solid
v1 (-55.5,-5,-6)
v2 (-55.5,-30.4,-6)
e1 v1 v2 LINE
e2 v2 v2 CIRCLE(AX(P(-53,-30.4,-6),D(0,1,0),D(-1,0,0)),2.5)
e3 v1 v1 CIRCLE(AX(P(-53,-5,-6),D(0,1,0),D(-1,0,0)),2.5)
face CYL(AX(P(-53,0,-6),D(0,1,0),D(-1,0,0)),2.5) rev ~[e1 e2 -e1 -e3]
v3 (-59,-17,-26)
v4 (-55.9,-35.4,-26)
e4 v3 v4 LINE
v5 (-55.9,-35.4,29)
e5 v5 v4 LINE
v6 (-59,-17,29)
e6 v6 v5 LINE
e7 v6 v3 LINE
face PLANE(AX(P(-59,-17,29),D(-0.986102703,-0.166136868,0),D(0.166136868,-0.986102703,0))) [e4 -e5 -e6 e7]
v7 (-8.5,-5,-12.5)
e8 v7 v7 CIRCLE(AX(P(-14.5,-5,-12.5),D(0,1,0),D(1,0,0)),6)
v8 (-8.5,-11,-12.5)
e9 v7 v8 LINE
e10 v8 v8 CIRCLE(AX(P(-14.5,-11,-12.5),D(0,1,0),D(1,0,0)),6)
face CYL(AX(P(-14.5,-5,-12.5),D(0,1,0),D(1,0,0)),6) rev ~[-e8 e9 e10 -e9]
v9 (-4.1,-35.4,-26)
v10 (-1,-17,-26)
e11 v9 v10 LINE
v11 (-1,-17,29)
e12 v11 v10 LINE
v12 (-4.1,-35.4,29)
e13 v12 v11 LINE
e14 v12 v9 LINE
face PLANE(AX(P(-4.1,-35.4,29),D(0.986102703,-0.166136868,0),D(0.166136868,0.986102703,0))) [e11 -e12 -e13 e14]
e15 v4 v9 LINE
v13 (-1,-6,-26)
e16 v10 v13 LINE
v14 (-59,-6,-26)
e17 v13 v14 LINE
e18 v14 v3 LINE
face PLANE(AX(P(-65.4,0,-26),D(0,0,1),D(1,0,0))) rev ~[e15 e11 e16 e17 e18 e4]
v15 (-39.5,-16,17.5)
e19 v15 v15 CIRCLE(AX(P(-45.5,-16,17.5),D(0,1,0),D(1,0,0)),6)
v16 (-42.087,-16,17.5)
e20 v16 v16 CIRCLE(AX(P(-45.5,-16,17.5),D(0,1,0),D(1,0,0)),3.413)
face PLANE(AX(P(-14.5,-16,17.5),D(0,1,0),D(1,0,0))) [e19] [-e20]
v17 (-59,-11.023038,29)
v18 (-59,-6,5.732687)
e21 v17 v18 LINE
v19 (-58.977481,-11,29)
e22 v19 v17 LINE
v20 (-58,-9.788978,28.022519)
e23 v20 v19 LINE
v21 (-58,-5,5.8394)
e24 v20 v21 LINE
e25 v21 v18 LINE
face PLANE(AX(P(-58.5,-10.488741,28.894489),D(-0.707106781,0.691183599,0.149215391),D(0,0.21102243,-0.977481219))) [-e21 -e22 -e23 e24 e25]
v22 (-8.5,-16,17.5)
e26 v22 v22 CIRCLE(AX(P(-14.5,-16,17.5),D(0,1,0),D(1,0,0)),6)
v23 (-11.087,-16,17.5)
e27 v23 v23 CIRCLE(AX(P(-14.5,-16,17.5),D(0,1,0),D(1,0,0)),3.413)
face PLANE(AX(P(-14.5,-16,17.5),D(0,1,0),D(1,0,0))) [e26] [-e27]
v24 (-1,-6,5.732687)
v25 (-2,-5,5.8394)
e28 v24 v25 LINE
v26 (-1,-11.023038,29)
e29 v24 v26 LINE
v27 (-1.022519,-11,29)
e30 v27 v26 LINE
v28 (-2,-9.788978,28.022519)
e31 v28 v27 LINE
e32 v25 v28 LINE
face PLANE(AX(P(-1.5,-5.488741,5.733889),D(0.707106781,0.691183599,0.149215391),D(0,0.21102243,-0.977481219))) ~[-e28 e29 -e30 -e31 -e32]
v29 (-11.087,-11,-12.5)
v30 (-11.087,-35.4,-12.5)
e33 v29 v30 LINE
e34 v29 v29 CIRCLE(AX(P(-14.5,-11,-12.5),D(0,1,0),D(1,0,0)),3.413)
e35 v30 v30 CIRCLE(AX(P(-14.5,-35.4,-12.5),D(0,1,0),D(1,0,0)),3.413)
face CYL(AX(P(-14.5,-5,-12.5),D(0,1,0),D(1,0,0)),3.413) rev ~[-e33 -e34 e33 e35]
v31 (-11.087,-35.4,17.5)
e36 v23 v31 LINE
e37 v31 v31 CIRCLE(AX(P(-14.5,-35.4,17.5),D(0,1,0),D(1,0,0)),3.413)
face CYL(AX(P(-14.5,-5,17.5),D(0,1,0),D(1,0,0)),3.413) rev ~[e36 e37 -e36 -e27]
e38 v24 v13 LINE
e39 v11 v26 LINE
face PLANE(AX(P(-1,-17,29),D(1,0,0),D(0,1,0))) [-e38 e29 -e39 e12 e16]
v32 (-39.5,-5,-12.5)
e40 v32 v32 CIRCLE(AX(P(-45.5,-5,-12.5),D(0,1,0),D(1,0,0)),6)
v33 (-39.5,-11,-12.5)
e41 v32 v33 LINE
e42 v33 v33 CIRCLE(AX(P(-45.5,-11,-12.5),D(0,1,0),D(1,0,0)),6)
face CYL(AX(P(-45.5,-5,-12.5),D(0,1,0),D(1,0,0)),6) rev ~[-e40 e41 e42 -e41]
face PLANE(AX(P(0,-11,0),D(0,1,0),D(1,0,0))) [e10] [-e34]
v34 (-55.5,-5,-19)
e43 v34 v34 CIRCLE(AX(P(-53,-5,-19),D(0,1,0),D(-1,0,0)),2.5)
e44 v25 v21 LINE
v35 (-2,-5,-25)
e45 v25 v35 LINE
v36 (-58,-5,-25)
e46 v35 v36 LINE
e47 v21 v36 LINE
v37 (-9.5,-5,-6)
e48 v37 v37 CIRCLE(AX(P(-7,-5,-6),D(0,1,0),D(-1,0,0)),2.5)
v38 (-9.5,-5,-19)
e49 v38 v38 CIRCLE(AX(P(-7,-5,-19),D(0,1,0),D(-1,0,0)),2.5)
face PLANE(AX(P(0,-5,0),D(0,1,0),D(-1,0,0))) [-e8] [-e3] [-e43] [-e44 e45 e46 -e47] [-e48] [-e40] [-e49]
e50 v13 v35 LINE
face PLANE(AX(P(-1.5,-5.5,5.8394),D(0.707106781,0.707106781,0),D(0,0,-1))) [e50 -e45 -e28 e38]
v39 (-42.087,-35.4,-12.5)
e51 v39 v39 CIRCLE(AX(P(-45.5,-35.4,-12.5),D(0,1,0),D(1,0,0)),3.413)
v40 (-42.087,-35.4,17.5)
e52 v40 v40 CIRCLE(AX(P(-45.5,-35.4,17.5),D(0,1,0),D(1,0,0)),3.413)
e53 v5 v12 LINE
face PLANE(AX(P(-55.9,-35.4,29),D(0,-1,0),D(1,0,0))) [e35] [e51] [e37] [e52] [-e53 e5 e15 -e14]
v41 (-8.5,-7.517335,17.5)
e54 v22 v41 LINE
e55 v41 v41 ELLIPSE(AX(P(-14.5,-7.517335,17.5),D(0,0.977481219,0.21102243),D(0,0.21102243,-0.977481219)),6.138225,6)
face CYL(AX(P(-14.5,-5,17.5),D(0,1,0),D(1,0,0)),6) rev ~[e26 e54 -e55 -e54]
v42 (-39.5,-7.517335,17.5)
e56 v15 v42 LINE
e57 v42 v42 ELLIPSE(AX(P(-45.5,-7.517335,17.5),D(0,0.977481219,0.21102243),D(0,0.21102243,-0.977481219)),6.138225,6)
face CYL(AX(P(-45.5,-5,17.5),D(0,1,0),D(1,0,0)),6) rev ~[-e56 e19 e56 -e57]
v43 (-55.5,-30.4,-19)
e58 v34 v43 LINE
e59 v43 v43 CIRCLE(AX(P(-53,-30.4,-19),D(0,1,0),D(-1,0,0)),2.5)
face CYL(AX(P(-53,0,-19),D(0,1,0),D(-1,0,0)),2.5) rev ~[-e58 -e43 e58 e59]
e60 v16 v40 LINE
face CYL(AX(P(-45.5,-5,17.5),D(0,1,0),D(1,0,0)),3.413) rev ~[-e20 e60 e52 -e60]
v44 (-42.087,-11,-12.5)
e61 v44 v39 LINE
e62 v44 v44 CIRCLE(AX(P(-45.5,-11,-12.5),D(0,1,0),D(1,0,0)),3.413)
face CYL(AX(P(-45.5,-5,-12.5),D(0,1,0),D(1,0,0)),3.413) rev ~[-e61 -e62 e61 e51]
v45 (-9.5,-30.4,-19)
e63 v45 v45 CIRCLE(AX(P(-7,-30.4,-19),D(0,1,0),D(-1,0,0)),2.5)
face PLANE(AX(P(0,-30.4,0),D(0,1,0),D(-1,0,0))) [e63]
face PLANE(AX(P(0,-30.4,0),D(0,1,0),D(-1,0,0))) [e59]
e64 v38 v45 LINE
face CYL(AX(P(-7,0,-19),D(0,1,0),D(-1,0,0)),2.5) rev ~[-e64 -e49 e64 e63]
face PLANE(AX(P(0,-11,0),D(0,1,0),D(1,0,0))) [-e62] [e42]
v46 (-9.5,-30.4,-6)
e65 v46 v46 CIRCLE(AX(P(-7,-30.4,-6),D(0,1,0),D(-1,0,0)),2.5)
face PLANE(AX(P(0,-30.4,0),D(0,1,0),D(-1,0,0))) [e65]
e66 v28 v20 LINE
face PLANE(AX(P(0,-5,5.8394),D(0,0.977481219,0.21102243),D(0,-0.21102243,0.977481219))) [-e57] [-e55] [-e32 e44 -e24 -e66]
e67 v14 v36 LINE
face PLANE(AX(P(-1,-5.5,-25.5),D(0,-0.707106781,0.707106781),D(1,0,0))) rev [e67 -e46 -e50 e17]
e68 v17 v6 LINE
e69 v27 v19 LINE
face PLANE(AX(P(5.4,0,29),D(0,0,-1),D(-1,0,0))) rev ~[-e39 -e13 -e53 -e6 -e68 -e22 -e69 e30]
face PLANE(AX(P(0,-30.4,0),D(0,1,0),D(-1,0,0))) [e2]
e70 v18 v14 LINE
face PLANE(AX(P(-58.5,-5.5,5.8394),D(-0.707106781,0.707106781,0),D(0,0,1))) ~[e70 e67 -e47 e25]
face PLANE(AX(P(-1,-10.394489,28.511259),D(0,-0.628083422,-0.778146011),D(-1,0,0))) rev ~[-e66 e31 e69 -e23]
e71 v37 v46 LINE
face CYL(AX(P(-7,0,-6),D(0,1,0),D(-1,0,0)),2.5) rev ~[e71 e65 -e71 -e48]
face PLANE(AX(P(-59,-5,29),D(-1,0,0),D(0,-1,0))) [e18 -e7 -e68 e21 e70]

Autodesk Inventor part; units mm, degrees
ref_plane "YZ Plane" through (0, 0, 0) normal (1, 0, 0) x (0, 1, 0)
ref_plane "XZ Plane" through (0, 0, 0) normal (0, 1, 0) x (-1, 0, 0)
ref_plane "XY Plane" through (0, 0, 0) normal (0, 0, 1) x (1, 0, 0)
sketch "Sketch1" plane through (0, 0, 0) normal (0, 1, 0) x (-1, 0, 0)
  line L0 (0, 0) -> (60, 0) construction
  line L1 (60, 0) -> (60, -25) construction
  line L2 (60, -25) -> (0, -25) construction
  line L3 (0, -25) -> (0, 0) construction
  line L4 (60.5, 0.5) -> (-0.5, 0.5)
  line L5 (-0.5, 0.5) -> (-0.5, -25.5)
  line L6 (-0.5, -25.5) -> (60.5, -25.5)
  line L7 (60.5, -25.5) -> (60.5, 0.5)
  circle A0 centre (53, -19) radius 2.5
  circle A1 centre (7, -19) radius 2.5
  circle A2 centre (7, -6) radius 2.5
  circle A3 centre (53, -6) radius 2.5
  line L8 (53, -19) -> (7, -19) construction
  line L9 (7, -19) -> (7, -6) construction
  line L10 (60.5, 0.5) -> (60.5, 20.5)
  line L11 (60.5, 20.5) -> (-0.5, 20.5)
  line L12 (-0.5, 20.5) -> (-0.5, 0)
  line L13 (89.6876, -43.5705) -> (-21.1545, -43.5705)
  line L14 (-21.1545, -43.5705) -> (-21.1545, 42.1657)
  line L15 (-21.1545, 42.1657) -> (89.6876, 42.1657)
  line L16 (89.6876, 42.1657) -> (89.6876, -43.5705)
  point P0 (30, -19)
  point P1 (30, -25)
  point P2 (7, -12.5)
  point P3 (0, -12.5)
  point P4 (-0.5, 0.5)
  point P5 (-0.5, 0.5)
  dimension "d0" = 25
  dimension "d1" = 60
  dimension "d2" = 0.5
  dimension "d3" = 0.5
  dimension "d4" = 0.5
  dimension "d5" = 0.5
  dimension "d6" = 5
  dimension "d7" = 46
  dimension "d8" = 13
  dimension "d72" = 20
sketch "Sketch2" plane through (0, 0, 0) normal (0, 1, 0) x (-1, 0, 0)
  line L0 (-5.4, 29) -> (65.4, 29)
  line L1 (65.4, 29) -> (65.4, -26)
  line L2 (65.4, -26) -> (-5.4, -26)
  line L3 (-5.4, -26) -> (-5.4, 29)
  line L4 (60.5, -25.5) -> (60.5, 0.5) construction
  line L5 (-0.5, 0.5) -> (-0.5, -25.5) construction
  line L6 (-0.5, -25.5) -> (60.5, -25.5) construction
  point P0 (0, 0)
  point P1 (60.5, -12.5)
  point P2 (65.4, 1.5)
  point P3 (30, -26)
  point P4 (30, -25.5)
  point P5 (30, -53.5)
  point P6 (110, 1.5)
  dimension "d9" = 70.8
  dimension "d10" = 55
  dimension "d50" = 35.4
  dimension "d74" = 13.5
extrude "Extrusion1" add sketch "Sketch2" against normal blind 35.4
extrude "Extrusion2" cut sketch "Sketch1" along normal blind 10 and the other way blind 5 contours L7 L6 L5 L4 | L4 L12 L11 L10 | L13 L14 L15 L16
extrude "Extrusion3" cut sketch "Sketch1" along normal blind 10 and the other way blind 30.4 contours A0 | A1 | A2 | A3
sketch "Sketch3" plane through (5.4, -35.4, -26) normal (0, 0, -1) x (1, 0, 0)
  line L0 (-70.8, 0) -> (-70.8, 17.5)
  line L1 (-70.8, 17.5) -> (-61.3, 17.5)
  line L2 (-61.3, 17.5) -> (-61.3, 3.175)
  line L3 (0, 0) -> (0, 17.5)
  line L4 (0, 17.5) -> (-9.5, 17.5)
  line L5 (-9.5, 17.5) -> (-9.5, 3.175)
  arc A0 (-61.3, 3.175) -> (-58.125, 0) centre (-58.125, 3.175) ccw
  arc A1 (-12.675, 0) -> (-9.5, 3.175) centre (-12.675, 3.175) ccw
  line L6 (0, 0) -> (-12.675, 0)
  line L7 (-70.8, -35.4) -> (-70.8, 0) projected
  line L8 (-70.8, 0) -> (0, 0) projected
  line L9 (-58.125, 0) -> (-70.8, 0)
  point P0 (-61.3, 0)
  dimension "d67" = 3.175
  dimension "d68" = 9.5
  dimension "d69" = 17.5
  dimension "d70" = 90
  dimension "d71" = 90
extrude "Extrusion4" add sketch "Sketch3" against normal up to surface (55 mm away)
sketch "Sketch4" plane through (0, -5, 0) normal (0, 1, 0) x (1, 0, 0)
  circle A0 centre (-45.5, -17.5) radius 3.413
  circle A1 centre (-14.5, -17.5) radius 3.413
  line L0 (-45.5, -17.5) -> (-14.5, -17.5) construction
  line L1 (-65.4, 26) -> (5.4, 26) projected
  line L2 (-45.5, -17.5) -> (-45.5, 12.5) construction
  line L3 (-45.5, 12.5) -> (-14.5, 12.5) construction
  line L4 (-14.5, 12.5) -> (-14.5, -17.5) construction
  circle A2 centre (-45.5, 12.5) radius 3.413
  circle A3 centre (-14.5, 12.5) radius 3.413
  point P0 (-30, -17.5)
  point P1 (-30, 26)
  dimension "d29" = 6.826
  dimension "d78" = 30
  dimension "d79" = 31
  dimension "d80" = 13.5
extrude "Extrusion5" cut sketch "Sketch4" against normal blind 36.5125
sketch "Sketch5" plane through (0, -5, 0) normal (0, 1, 0) x (1, 0, 0)
  circle A0 centre (-45.5, -17.5) radius 3.413 construction
  circle A1 centre (-14.5, -17.5) radius 3.413 construction
  circle A2 centre (-14.5, -17.5) radius 6
  circle A3 centre (-45.5, -17.5) radius 6
  circle A4 centre (-45.5, 12.5) radius 6
  circle A5 centre (-14.5, 12.5) radius 6
  circle A6 centre (-14.5, 12.5) radius 3.413 projected
  circle A7 centre (-45.5, 12.5) radius 3.413 projected
  point P0 (0, 0)
  point P1 (-43.1765, -26)
  point P2 (-47.8235, -26)
  point P3 (-12.1765, -26)
  point P4 (-16.8235, -26)
  dimension "d34" = 12
extrude "Extrusion6" cut sketch "Sketch5" against normal blind 6 contours A2 | A3 | A4 | A5 | A6
sketch "Sketch8" plane through (-52.725, -35.4, 29) normal (0, 0, 1) x (-1, 0, 0)
  line L0 (-22.725, 0) -> (-13.725, 0)
  line L1 (-13.725, 0) -> (-12.725, 1)
  line L2 (-12.725, 1) -> (-12.725, 4)
  line L3 (-12.725, 4) -> (-16.175, 7.45)
  line L4 (-16.175, 7.45) -> (-16.175, 9.8767)
  line L5 (-16.175, 9.8767) -> (-14.9578, 11.0939)
  arc A0 (-13.2458, 12.8058) -> (-14.9578, 11.0939) centre (-12.9761, 10.8241) ccw
  line L6 (-13.2458, 12.8058) -> (-12.725, 13.3267)
  line L7 (-12.725, 13.3267) -> (-12.725, 14.66)
  line L8 (-12.725, 14.66) -> (-13.2458, 15.1808)
  arc A1 (-14.9578, 16.8928) -> (-13.2458, 15.1808) centre (-12.9761, 17.1626) ccw
  line L9 (-14.9578, 16.8928) -> (-15.565, 17.5)
  line L10 (-15.565, 17.5) -> (-22.725, 17.5)
  line L11 (-22.725, 17.5) -> (-22.725, 0) construction
  line L12 (-14.9578, 11.0939) -> (-13.2458, 12.8058) construction
  line L13 (-14.9578, 16.8928) -> (-13.2458, 15.1808) construction
  line L14 (-29.275, 7.45) -> (-29.275, 9.8767)
  line L15 (-29.275, 9.8767) -> (-30.4922, 11.0939)
  line L16 (-30.4922, 11.0939) -> (-32.2042, 12.8058) construction
  arc A2 (-30.4922, 11.0939) -> (-32.2042, 12.8058) centre (-32.4739, 10.8241) ccw
  line L17 (-32.2042, 12.8058) -> (-32.725, 13.3267)
  line L18 (-32.725, 13.3267) -> (-32.725, 14.66)
  line L19 (-32.725, 14.66) -> (-32.2042, 15.1808)
  line L20 (-30.4922, 16.8928) -> (-32.2042, 15.1808) construction
  arc A3 (-32.2042, 15.1808) -> (-30.4922, 16.8928) centre (-32.4739, 17.1626) ccw
  line L21 (-29.885, 17.5) -> (-22.725, 17.5)
  line L22 (-30.4922, 16.8928) -> (-29.885, 17.5)
  line L23 (-32.725, 4) -> (-29.275, 7.45)
  line L24 (-22.725, 0) -> (-31.725, 0)
  line L25 (-32.725, 1) -> (-32.725, 4)
  line L26 (-31.725, 0) -> (-32.725, 1)
  line L27 (-13.725, 0) -> (-12.725, 0)
  line L28 (-12.725, 1) -> (-12.725, 0)
  line L29 (-32.725, 1) -> (-32.725, 0)
  line L30 (-32.725, 0) -> (-31.725, 0)
  line L31 (-13.725, 0) -> (-12.725, -1)
  line L32 (-12.725, -1) -> (-12.725, -4)
  line L33 (-16.175, -7.45) -> (-16.175, -9.8767)
  line L34 (-12.725, -4) -> (-16.175, -7.45)
  line L35 (-12.725, -1) -> (-12.725, 0)
  line L36 (-31.725, 0) -> (-32.725, -1)
  line L37 (-32.725, -4) -> (-29.275, -7.45)
  line L38 (-32.2042, -12.8058) -> (-32.725, -13.3267)
  line L39 (-32.725, -13.3267) -> (-32.725, -14.66)
  line L40 (-29.275, -7.45) -> (-29.275, -9.8767)
  line L41 (-32.725, -14.66) -> (-32.2042, -15.1808)
  line L42 (-30.4922, -11.0939) -> (-32.2042, -12.8058) construction
  arc A4 (-32.2042, -12.8058) -> (-30.4922, -11.0939) centre (-32.4739, -10.8241) ccw
  line L43 (-29.275, -9.8767) -> (-30.4922, -11.0939)
  line L44 (-30.4922, -16.8928) -> (-32.2042, -15.1808) construction
  arc A5 (-30.4922, -16.8928) -> (-32.2042, -15.1808) centre (-32.4739, -17.1626) ccw
  line L45 (-30.4922, -16.8928) -> (-29.885, -17.5)
  line L46 (-29.885, -17.5) -> (-22.725, -17.5)
  line L47 (-22.725, -17.5) -> (-22.725, 0) construction
  line L48 (-32.725, -1) -> (-32.725, 0)
  line L49 (-32.725, -1) -> (-32.725, -4)
  line L50 (-16.175, -9.8767) -> (-14.9578, -11.0939)
  line L51 (-14.9578, -11.0939) -> (-13.2458, -12.8058) construction
  arc A6 (-14.9578, -11.0939) -> (-13.2458, -12.8058) centre (-12.9761, -10.8241) ccw
  line L52 (-13.2458, -12.8058) -> (-12.725, -13.3267)
  line L53 (-12.725, -13.3267) -> (-12.725, -14.66)
  line L54 (-12.725, -14.66) -> (-13.2458, -15.1808)
  line L55 (-15.565, -17.5) -> (-22.725, -17.5)
  line L56 (-14.9578, -16.8928) -> (-13.2458, -15.1808) construction
  arc A7 (-13.2458, -15.1808) -> (-14.9578, -16.8928) centre (-12.9761, -17.1626) ccw
  line L57 (-14.9578, -16.8928) -> (-15.565, -17.5)
  line L58 (-45.45, 0) -> (0, 0) projected
  point P0 (-52.725, -35.4)
  point P1 (-12.725, 2.5)
  point P2 (-32.725, 0.5)
  point P3 (-12.725, -2.5)
  point P4 (-32.725, -0.5)
  dimension "d51" = 1
  dimension "d52" = 3
  dimension "d53" = 135
  dimension "d54" = 2
  dimension "d55" = 3.45
  dimension "d56" = 17.5
  dimension "d57" = 7.16
  dimension "d58" = 2.375
  dimension "d59" = 1.3333
  dimension "d60" = 2.4211
  dimension "d61" = 10
extrude "Extrusion9" cut sketch "Sketch8" against normal up to surface (55 mm away) contours L0 L31 L32 L34 L33 L50 A6 L52 L53 L54 A7 L57 L55 L46 L45 A5 L41 L39 L38 A4 L43 L40 L37 L49 L36 L24 | L27 L35 L31 | L36 L48 L30
sketch "Sketch10" plane through (-65.4, -5, 29) normal (0, 0, 1) x (1, 0, 0)
  arc A0 (12.675, -30.4) -> (9.5, -33.575) centre (12.675, -33.575) ccw projected
  line L0 (0, 0) -> (0, -47.9) projected
  line L1 (70.8, 0) -> (0, 0) projected
  line L2 (9.5, -33.575) -> (9.5, -30.4)
  line L3 (9.5, -30.4) -> (12.675, -30.4)
  line L4 (9.5, -47.9) -> (0, -47.9) projected
  line L5 (0, -47.9) -> (9.5, -47.9)
  line L6 (9.5, -47.9) -> (9.5, -33.575)
  line L7 (44.9, -6) -> (56.9, -6) projected
  line L8 (45.4, -26.4) -> (45.4, -30.4) projected
  line L9 (58.125, -30.4) -> (45.4, -30.4) projected
  arc A1 (61.3, -33.575) -> (58.125, -30.4) centre (58.125, -33.575) ccw projected
  line L10 (61.3, -47.9) -> (61.3, -33.575) projected
  line L11 (70.8, -47.9) -> (61.3, -47.9) projected
  line L12 (70.8, 0) -> (70.8, -47.9) projected
  line L13 (70.8, 0) -> (0, 0) projected
  line L14 (0, 0) -> (0, -47.9) projected
  line L15 (9.5, -47.9) -> (0, -47.9) projected
  line L16 (9.5, -33.575) -> (9.5, -47.9) projected
  arc A2 (12.675, -30.4) -> (9.5, -33.575) centre (12.675, -33.575) ccw projected
  line L17 (25.4, -30.4) -> (12.675, -30.4) projected
  line L18 (25.4, -30.4) -> (25.4, -26.4) projected
  line L19 (25.4, -26.4) -> (28.85, -22.95) projected
  line L20 (28.85, -22.95) -> (28.85, -20.5233) projected
  line L21 (28.85, -20.5233) -> (27.6328, -19.3061) projected
  arc A3 (27.6328, -19.3061) -> (25.9208, -17.5942) centre (25.6511, -19.5759) ccw projected
  line L22 (25.9208, -17.5942) -> (25.4, -17.0733) projected
  line L23 (25.4, -17.0733) -> (25.4, -15.74) projected
  line L24 (25.4, -15.74) -> (25.9208, -15.2192) projected
  arc A4 (25.9208, -15.2192) -> (27.6328, -13.5072) centre (25.6511, -13.2374) ccw projected
  line L25 (27.6328, -13.5072) -> (28.24, -12.9) projected
  line L26 (28.24, -12.9) -> (42.56, -12.9) projected
  line L27 (42.56, -12.9) -> (43.1672, -13.5072) projected
  arc A5 (43.1672, -13.5072) -> (44.8792, -15.2192) centre (45.1489, -13.2374) ccw projected
  line L28 (44.8792, -15.2192) -> (45.4, -15.74) projected
  line L29 (45.4, -15.74) -> (45.4, -17.0733) projected
  line L30 (45.4, -17.0733) -> (44.8792, -17.5942) projected
  arc A6 (44.8792, -17.5942) -> (43.1672, -19.3061) centre (45.1489, -19.5759) ccw projected
  line L31 (43.1672, -19.3061) -> (41.95, -20.5233) projected
  line L32 (41.95, -20.5233) -> (41.95, -22.95) projected
  line L33 (41.95, -22.95) -> (45.4, -26.4) projected
  line L34 (58.125, -30.4) -> (61.3, -30.4)
  line L35 (61.3, -30.4) -> (61.3, -33.575)
  line L36 (9.5, -30.4) -> (6.4, 0)
  line L37 (0, 0) -> (70.8, 0) projected
  line L38 (61.3, -30.4) -> (64.4, 0)
  line L39 (6.4, 0) -> (6.4, -12)
  line L40 (6.4, -12) -> (9.5, -30.4)
  line L41 (61.3, -30.4) -> (64.4, -12)
  line L42 (64.4, -12) -> (64.4, 0)
  point P0 (65.4, 5)
  point P1 (64.4, 0)
  point P2 (6.4, 0)
  point P3 (6.4, 0)
  point P4 (64.4, 0)
  dimension "d86" = 58
  dimension "d101" = 12
extrude "Extrusion10" cut sketch "Sketch10" against normal through all contours A0 L2 L3 | L6 L4 L0 L1 L39 L40 L2 | L1 L12 L11 L10 L35 L41 L42 | L35 A1 L34
sketch "Sketch11" plane through (-37.16, -17.9, 29) normal (0, 0, 1) x (1, 0, 0)
  line L0 (-18.74, -17.5) -> (-2.84, -17.5) projected
  line L1 (-3.04, -17.5) -> (17.36, -17.5)
  line L2 (17.36, -17.5) -> (17.36, 0.1)
  line L3 (17.36, 0.1) -> (-3.04, 0.1)
  line L4 (-3.04, 0.1) -> (-3.04, -17.5)
  line L5 (-2.84, -17.5) -> (-2.84, -13.5) projected
  line L6 (17.16, -13.5) -> (17.16, -17.5) projected
  line L7 (0, 0) -> (14.32, 0) projected
  point P0 (37.16, 17.9)
  point P1 (-16.7296, -17.5)
  point P2 (-2.84, -15.5)
  dimension "d88" = 0.2
  dimension "d89" = 0.2
  dimension "d90" = 0.1
extrude "Extrusion11" add sketch "Sketch11" against normal up to surface (55 mm away)
sketch "Sketch12" plane through (0, 0, 0) normal (1, 0, 0) x (0, 1, 0)
  line L0 (-5, 5.8394) -> (-10, 29)
  line L1 (-35.4, 29) -> (-5, 29) projected
  line L2 (-5, 29) -> (-5, -26) projected
  point P0 (0, 0)
  dimension "d93" = 5
extrude "Extrusion12" cut sketch "Sketch12" against normal through all
sketch "Sketch13" plane through (-14.5, -11, 17.5) normal (0, 1, 0) x (1, 0, 0)
  circle A0 centre (0, 0) radius 3.413 projected
  circle A1 centre (0, 0) radius 6 projected
  circle A2 centre (-31, 0) radius 3.413 projected
  circle A3 centre (-31, 0) radius 3.413 projected
  circle A4 centre (-31, 0) radius 6 projected
  point P0 (14.5, 17.5)
extrude "Extrusion13" cut sketch "Sketch13" against normal blind 5
chamfer "Chamfer2" distance 1 angle 45 6 edges at (-30, -10, 29) (-30, -5, -26) (-1, -7.5, 17.4197) (-59, -7.5, 17.4197) (-59, -5, -10.0803) (-1, -5, -10.0803)
properties part number "BK12_Spacer_Metal"
